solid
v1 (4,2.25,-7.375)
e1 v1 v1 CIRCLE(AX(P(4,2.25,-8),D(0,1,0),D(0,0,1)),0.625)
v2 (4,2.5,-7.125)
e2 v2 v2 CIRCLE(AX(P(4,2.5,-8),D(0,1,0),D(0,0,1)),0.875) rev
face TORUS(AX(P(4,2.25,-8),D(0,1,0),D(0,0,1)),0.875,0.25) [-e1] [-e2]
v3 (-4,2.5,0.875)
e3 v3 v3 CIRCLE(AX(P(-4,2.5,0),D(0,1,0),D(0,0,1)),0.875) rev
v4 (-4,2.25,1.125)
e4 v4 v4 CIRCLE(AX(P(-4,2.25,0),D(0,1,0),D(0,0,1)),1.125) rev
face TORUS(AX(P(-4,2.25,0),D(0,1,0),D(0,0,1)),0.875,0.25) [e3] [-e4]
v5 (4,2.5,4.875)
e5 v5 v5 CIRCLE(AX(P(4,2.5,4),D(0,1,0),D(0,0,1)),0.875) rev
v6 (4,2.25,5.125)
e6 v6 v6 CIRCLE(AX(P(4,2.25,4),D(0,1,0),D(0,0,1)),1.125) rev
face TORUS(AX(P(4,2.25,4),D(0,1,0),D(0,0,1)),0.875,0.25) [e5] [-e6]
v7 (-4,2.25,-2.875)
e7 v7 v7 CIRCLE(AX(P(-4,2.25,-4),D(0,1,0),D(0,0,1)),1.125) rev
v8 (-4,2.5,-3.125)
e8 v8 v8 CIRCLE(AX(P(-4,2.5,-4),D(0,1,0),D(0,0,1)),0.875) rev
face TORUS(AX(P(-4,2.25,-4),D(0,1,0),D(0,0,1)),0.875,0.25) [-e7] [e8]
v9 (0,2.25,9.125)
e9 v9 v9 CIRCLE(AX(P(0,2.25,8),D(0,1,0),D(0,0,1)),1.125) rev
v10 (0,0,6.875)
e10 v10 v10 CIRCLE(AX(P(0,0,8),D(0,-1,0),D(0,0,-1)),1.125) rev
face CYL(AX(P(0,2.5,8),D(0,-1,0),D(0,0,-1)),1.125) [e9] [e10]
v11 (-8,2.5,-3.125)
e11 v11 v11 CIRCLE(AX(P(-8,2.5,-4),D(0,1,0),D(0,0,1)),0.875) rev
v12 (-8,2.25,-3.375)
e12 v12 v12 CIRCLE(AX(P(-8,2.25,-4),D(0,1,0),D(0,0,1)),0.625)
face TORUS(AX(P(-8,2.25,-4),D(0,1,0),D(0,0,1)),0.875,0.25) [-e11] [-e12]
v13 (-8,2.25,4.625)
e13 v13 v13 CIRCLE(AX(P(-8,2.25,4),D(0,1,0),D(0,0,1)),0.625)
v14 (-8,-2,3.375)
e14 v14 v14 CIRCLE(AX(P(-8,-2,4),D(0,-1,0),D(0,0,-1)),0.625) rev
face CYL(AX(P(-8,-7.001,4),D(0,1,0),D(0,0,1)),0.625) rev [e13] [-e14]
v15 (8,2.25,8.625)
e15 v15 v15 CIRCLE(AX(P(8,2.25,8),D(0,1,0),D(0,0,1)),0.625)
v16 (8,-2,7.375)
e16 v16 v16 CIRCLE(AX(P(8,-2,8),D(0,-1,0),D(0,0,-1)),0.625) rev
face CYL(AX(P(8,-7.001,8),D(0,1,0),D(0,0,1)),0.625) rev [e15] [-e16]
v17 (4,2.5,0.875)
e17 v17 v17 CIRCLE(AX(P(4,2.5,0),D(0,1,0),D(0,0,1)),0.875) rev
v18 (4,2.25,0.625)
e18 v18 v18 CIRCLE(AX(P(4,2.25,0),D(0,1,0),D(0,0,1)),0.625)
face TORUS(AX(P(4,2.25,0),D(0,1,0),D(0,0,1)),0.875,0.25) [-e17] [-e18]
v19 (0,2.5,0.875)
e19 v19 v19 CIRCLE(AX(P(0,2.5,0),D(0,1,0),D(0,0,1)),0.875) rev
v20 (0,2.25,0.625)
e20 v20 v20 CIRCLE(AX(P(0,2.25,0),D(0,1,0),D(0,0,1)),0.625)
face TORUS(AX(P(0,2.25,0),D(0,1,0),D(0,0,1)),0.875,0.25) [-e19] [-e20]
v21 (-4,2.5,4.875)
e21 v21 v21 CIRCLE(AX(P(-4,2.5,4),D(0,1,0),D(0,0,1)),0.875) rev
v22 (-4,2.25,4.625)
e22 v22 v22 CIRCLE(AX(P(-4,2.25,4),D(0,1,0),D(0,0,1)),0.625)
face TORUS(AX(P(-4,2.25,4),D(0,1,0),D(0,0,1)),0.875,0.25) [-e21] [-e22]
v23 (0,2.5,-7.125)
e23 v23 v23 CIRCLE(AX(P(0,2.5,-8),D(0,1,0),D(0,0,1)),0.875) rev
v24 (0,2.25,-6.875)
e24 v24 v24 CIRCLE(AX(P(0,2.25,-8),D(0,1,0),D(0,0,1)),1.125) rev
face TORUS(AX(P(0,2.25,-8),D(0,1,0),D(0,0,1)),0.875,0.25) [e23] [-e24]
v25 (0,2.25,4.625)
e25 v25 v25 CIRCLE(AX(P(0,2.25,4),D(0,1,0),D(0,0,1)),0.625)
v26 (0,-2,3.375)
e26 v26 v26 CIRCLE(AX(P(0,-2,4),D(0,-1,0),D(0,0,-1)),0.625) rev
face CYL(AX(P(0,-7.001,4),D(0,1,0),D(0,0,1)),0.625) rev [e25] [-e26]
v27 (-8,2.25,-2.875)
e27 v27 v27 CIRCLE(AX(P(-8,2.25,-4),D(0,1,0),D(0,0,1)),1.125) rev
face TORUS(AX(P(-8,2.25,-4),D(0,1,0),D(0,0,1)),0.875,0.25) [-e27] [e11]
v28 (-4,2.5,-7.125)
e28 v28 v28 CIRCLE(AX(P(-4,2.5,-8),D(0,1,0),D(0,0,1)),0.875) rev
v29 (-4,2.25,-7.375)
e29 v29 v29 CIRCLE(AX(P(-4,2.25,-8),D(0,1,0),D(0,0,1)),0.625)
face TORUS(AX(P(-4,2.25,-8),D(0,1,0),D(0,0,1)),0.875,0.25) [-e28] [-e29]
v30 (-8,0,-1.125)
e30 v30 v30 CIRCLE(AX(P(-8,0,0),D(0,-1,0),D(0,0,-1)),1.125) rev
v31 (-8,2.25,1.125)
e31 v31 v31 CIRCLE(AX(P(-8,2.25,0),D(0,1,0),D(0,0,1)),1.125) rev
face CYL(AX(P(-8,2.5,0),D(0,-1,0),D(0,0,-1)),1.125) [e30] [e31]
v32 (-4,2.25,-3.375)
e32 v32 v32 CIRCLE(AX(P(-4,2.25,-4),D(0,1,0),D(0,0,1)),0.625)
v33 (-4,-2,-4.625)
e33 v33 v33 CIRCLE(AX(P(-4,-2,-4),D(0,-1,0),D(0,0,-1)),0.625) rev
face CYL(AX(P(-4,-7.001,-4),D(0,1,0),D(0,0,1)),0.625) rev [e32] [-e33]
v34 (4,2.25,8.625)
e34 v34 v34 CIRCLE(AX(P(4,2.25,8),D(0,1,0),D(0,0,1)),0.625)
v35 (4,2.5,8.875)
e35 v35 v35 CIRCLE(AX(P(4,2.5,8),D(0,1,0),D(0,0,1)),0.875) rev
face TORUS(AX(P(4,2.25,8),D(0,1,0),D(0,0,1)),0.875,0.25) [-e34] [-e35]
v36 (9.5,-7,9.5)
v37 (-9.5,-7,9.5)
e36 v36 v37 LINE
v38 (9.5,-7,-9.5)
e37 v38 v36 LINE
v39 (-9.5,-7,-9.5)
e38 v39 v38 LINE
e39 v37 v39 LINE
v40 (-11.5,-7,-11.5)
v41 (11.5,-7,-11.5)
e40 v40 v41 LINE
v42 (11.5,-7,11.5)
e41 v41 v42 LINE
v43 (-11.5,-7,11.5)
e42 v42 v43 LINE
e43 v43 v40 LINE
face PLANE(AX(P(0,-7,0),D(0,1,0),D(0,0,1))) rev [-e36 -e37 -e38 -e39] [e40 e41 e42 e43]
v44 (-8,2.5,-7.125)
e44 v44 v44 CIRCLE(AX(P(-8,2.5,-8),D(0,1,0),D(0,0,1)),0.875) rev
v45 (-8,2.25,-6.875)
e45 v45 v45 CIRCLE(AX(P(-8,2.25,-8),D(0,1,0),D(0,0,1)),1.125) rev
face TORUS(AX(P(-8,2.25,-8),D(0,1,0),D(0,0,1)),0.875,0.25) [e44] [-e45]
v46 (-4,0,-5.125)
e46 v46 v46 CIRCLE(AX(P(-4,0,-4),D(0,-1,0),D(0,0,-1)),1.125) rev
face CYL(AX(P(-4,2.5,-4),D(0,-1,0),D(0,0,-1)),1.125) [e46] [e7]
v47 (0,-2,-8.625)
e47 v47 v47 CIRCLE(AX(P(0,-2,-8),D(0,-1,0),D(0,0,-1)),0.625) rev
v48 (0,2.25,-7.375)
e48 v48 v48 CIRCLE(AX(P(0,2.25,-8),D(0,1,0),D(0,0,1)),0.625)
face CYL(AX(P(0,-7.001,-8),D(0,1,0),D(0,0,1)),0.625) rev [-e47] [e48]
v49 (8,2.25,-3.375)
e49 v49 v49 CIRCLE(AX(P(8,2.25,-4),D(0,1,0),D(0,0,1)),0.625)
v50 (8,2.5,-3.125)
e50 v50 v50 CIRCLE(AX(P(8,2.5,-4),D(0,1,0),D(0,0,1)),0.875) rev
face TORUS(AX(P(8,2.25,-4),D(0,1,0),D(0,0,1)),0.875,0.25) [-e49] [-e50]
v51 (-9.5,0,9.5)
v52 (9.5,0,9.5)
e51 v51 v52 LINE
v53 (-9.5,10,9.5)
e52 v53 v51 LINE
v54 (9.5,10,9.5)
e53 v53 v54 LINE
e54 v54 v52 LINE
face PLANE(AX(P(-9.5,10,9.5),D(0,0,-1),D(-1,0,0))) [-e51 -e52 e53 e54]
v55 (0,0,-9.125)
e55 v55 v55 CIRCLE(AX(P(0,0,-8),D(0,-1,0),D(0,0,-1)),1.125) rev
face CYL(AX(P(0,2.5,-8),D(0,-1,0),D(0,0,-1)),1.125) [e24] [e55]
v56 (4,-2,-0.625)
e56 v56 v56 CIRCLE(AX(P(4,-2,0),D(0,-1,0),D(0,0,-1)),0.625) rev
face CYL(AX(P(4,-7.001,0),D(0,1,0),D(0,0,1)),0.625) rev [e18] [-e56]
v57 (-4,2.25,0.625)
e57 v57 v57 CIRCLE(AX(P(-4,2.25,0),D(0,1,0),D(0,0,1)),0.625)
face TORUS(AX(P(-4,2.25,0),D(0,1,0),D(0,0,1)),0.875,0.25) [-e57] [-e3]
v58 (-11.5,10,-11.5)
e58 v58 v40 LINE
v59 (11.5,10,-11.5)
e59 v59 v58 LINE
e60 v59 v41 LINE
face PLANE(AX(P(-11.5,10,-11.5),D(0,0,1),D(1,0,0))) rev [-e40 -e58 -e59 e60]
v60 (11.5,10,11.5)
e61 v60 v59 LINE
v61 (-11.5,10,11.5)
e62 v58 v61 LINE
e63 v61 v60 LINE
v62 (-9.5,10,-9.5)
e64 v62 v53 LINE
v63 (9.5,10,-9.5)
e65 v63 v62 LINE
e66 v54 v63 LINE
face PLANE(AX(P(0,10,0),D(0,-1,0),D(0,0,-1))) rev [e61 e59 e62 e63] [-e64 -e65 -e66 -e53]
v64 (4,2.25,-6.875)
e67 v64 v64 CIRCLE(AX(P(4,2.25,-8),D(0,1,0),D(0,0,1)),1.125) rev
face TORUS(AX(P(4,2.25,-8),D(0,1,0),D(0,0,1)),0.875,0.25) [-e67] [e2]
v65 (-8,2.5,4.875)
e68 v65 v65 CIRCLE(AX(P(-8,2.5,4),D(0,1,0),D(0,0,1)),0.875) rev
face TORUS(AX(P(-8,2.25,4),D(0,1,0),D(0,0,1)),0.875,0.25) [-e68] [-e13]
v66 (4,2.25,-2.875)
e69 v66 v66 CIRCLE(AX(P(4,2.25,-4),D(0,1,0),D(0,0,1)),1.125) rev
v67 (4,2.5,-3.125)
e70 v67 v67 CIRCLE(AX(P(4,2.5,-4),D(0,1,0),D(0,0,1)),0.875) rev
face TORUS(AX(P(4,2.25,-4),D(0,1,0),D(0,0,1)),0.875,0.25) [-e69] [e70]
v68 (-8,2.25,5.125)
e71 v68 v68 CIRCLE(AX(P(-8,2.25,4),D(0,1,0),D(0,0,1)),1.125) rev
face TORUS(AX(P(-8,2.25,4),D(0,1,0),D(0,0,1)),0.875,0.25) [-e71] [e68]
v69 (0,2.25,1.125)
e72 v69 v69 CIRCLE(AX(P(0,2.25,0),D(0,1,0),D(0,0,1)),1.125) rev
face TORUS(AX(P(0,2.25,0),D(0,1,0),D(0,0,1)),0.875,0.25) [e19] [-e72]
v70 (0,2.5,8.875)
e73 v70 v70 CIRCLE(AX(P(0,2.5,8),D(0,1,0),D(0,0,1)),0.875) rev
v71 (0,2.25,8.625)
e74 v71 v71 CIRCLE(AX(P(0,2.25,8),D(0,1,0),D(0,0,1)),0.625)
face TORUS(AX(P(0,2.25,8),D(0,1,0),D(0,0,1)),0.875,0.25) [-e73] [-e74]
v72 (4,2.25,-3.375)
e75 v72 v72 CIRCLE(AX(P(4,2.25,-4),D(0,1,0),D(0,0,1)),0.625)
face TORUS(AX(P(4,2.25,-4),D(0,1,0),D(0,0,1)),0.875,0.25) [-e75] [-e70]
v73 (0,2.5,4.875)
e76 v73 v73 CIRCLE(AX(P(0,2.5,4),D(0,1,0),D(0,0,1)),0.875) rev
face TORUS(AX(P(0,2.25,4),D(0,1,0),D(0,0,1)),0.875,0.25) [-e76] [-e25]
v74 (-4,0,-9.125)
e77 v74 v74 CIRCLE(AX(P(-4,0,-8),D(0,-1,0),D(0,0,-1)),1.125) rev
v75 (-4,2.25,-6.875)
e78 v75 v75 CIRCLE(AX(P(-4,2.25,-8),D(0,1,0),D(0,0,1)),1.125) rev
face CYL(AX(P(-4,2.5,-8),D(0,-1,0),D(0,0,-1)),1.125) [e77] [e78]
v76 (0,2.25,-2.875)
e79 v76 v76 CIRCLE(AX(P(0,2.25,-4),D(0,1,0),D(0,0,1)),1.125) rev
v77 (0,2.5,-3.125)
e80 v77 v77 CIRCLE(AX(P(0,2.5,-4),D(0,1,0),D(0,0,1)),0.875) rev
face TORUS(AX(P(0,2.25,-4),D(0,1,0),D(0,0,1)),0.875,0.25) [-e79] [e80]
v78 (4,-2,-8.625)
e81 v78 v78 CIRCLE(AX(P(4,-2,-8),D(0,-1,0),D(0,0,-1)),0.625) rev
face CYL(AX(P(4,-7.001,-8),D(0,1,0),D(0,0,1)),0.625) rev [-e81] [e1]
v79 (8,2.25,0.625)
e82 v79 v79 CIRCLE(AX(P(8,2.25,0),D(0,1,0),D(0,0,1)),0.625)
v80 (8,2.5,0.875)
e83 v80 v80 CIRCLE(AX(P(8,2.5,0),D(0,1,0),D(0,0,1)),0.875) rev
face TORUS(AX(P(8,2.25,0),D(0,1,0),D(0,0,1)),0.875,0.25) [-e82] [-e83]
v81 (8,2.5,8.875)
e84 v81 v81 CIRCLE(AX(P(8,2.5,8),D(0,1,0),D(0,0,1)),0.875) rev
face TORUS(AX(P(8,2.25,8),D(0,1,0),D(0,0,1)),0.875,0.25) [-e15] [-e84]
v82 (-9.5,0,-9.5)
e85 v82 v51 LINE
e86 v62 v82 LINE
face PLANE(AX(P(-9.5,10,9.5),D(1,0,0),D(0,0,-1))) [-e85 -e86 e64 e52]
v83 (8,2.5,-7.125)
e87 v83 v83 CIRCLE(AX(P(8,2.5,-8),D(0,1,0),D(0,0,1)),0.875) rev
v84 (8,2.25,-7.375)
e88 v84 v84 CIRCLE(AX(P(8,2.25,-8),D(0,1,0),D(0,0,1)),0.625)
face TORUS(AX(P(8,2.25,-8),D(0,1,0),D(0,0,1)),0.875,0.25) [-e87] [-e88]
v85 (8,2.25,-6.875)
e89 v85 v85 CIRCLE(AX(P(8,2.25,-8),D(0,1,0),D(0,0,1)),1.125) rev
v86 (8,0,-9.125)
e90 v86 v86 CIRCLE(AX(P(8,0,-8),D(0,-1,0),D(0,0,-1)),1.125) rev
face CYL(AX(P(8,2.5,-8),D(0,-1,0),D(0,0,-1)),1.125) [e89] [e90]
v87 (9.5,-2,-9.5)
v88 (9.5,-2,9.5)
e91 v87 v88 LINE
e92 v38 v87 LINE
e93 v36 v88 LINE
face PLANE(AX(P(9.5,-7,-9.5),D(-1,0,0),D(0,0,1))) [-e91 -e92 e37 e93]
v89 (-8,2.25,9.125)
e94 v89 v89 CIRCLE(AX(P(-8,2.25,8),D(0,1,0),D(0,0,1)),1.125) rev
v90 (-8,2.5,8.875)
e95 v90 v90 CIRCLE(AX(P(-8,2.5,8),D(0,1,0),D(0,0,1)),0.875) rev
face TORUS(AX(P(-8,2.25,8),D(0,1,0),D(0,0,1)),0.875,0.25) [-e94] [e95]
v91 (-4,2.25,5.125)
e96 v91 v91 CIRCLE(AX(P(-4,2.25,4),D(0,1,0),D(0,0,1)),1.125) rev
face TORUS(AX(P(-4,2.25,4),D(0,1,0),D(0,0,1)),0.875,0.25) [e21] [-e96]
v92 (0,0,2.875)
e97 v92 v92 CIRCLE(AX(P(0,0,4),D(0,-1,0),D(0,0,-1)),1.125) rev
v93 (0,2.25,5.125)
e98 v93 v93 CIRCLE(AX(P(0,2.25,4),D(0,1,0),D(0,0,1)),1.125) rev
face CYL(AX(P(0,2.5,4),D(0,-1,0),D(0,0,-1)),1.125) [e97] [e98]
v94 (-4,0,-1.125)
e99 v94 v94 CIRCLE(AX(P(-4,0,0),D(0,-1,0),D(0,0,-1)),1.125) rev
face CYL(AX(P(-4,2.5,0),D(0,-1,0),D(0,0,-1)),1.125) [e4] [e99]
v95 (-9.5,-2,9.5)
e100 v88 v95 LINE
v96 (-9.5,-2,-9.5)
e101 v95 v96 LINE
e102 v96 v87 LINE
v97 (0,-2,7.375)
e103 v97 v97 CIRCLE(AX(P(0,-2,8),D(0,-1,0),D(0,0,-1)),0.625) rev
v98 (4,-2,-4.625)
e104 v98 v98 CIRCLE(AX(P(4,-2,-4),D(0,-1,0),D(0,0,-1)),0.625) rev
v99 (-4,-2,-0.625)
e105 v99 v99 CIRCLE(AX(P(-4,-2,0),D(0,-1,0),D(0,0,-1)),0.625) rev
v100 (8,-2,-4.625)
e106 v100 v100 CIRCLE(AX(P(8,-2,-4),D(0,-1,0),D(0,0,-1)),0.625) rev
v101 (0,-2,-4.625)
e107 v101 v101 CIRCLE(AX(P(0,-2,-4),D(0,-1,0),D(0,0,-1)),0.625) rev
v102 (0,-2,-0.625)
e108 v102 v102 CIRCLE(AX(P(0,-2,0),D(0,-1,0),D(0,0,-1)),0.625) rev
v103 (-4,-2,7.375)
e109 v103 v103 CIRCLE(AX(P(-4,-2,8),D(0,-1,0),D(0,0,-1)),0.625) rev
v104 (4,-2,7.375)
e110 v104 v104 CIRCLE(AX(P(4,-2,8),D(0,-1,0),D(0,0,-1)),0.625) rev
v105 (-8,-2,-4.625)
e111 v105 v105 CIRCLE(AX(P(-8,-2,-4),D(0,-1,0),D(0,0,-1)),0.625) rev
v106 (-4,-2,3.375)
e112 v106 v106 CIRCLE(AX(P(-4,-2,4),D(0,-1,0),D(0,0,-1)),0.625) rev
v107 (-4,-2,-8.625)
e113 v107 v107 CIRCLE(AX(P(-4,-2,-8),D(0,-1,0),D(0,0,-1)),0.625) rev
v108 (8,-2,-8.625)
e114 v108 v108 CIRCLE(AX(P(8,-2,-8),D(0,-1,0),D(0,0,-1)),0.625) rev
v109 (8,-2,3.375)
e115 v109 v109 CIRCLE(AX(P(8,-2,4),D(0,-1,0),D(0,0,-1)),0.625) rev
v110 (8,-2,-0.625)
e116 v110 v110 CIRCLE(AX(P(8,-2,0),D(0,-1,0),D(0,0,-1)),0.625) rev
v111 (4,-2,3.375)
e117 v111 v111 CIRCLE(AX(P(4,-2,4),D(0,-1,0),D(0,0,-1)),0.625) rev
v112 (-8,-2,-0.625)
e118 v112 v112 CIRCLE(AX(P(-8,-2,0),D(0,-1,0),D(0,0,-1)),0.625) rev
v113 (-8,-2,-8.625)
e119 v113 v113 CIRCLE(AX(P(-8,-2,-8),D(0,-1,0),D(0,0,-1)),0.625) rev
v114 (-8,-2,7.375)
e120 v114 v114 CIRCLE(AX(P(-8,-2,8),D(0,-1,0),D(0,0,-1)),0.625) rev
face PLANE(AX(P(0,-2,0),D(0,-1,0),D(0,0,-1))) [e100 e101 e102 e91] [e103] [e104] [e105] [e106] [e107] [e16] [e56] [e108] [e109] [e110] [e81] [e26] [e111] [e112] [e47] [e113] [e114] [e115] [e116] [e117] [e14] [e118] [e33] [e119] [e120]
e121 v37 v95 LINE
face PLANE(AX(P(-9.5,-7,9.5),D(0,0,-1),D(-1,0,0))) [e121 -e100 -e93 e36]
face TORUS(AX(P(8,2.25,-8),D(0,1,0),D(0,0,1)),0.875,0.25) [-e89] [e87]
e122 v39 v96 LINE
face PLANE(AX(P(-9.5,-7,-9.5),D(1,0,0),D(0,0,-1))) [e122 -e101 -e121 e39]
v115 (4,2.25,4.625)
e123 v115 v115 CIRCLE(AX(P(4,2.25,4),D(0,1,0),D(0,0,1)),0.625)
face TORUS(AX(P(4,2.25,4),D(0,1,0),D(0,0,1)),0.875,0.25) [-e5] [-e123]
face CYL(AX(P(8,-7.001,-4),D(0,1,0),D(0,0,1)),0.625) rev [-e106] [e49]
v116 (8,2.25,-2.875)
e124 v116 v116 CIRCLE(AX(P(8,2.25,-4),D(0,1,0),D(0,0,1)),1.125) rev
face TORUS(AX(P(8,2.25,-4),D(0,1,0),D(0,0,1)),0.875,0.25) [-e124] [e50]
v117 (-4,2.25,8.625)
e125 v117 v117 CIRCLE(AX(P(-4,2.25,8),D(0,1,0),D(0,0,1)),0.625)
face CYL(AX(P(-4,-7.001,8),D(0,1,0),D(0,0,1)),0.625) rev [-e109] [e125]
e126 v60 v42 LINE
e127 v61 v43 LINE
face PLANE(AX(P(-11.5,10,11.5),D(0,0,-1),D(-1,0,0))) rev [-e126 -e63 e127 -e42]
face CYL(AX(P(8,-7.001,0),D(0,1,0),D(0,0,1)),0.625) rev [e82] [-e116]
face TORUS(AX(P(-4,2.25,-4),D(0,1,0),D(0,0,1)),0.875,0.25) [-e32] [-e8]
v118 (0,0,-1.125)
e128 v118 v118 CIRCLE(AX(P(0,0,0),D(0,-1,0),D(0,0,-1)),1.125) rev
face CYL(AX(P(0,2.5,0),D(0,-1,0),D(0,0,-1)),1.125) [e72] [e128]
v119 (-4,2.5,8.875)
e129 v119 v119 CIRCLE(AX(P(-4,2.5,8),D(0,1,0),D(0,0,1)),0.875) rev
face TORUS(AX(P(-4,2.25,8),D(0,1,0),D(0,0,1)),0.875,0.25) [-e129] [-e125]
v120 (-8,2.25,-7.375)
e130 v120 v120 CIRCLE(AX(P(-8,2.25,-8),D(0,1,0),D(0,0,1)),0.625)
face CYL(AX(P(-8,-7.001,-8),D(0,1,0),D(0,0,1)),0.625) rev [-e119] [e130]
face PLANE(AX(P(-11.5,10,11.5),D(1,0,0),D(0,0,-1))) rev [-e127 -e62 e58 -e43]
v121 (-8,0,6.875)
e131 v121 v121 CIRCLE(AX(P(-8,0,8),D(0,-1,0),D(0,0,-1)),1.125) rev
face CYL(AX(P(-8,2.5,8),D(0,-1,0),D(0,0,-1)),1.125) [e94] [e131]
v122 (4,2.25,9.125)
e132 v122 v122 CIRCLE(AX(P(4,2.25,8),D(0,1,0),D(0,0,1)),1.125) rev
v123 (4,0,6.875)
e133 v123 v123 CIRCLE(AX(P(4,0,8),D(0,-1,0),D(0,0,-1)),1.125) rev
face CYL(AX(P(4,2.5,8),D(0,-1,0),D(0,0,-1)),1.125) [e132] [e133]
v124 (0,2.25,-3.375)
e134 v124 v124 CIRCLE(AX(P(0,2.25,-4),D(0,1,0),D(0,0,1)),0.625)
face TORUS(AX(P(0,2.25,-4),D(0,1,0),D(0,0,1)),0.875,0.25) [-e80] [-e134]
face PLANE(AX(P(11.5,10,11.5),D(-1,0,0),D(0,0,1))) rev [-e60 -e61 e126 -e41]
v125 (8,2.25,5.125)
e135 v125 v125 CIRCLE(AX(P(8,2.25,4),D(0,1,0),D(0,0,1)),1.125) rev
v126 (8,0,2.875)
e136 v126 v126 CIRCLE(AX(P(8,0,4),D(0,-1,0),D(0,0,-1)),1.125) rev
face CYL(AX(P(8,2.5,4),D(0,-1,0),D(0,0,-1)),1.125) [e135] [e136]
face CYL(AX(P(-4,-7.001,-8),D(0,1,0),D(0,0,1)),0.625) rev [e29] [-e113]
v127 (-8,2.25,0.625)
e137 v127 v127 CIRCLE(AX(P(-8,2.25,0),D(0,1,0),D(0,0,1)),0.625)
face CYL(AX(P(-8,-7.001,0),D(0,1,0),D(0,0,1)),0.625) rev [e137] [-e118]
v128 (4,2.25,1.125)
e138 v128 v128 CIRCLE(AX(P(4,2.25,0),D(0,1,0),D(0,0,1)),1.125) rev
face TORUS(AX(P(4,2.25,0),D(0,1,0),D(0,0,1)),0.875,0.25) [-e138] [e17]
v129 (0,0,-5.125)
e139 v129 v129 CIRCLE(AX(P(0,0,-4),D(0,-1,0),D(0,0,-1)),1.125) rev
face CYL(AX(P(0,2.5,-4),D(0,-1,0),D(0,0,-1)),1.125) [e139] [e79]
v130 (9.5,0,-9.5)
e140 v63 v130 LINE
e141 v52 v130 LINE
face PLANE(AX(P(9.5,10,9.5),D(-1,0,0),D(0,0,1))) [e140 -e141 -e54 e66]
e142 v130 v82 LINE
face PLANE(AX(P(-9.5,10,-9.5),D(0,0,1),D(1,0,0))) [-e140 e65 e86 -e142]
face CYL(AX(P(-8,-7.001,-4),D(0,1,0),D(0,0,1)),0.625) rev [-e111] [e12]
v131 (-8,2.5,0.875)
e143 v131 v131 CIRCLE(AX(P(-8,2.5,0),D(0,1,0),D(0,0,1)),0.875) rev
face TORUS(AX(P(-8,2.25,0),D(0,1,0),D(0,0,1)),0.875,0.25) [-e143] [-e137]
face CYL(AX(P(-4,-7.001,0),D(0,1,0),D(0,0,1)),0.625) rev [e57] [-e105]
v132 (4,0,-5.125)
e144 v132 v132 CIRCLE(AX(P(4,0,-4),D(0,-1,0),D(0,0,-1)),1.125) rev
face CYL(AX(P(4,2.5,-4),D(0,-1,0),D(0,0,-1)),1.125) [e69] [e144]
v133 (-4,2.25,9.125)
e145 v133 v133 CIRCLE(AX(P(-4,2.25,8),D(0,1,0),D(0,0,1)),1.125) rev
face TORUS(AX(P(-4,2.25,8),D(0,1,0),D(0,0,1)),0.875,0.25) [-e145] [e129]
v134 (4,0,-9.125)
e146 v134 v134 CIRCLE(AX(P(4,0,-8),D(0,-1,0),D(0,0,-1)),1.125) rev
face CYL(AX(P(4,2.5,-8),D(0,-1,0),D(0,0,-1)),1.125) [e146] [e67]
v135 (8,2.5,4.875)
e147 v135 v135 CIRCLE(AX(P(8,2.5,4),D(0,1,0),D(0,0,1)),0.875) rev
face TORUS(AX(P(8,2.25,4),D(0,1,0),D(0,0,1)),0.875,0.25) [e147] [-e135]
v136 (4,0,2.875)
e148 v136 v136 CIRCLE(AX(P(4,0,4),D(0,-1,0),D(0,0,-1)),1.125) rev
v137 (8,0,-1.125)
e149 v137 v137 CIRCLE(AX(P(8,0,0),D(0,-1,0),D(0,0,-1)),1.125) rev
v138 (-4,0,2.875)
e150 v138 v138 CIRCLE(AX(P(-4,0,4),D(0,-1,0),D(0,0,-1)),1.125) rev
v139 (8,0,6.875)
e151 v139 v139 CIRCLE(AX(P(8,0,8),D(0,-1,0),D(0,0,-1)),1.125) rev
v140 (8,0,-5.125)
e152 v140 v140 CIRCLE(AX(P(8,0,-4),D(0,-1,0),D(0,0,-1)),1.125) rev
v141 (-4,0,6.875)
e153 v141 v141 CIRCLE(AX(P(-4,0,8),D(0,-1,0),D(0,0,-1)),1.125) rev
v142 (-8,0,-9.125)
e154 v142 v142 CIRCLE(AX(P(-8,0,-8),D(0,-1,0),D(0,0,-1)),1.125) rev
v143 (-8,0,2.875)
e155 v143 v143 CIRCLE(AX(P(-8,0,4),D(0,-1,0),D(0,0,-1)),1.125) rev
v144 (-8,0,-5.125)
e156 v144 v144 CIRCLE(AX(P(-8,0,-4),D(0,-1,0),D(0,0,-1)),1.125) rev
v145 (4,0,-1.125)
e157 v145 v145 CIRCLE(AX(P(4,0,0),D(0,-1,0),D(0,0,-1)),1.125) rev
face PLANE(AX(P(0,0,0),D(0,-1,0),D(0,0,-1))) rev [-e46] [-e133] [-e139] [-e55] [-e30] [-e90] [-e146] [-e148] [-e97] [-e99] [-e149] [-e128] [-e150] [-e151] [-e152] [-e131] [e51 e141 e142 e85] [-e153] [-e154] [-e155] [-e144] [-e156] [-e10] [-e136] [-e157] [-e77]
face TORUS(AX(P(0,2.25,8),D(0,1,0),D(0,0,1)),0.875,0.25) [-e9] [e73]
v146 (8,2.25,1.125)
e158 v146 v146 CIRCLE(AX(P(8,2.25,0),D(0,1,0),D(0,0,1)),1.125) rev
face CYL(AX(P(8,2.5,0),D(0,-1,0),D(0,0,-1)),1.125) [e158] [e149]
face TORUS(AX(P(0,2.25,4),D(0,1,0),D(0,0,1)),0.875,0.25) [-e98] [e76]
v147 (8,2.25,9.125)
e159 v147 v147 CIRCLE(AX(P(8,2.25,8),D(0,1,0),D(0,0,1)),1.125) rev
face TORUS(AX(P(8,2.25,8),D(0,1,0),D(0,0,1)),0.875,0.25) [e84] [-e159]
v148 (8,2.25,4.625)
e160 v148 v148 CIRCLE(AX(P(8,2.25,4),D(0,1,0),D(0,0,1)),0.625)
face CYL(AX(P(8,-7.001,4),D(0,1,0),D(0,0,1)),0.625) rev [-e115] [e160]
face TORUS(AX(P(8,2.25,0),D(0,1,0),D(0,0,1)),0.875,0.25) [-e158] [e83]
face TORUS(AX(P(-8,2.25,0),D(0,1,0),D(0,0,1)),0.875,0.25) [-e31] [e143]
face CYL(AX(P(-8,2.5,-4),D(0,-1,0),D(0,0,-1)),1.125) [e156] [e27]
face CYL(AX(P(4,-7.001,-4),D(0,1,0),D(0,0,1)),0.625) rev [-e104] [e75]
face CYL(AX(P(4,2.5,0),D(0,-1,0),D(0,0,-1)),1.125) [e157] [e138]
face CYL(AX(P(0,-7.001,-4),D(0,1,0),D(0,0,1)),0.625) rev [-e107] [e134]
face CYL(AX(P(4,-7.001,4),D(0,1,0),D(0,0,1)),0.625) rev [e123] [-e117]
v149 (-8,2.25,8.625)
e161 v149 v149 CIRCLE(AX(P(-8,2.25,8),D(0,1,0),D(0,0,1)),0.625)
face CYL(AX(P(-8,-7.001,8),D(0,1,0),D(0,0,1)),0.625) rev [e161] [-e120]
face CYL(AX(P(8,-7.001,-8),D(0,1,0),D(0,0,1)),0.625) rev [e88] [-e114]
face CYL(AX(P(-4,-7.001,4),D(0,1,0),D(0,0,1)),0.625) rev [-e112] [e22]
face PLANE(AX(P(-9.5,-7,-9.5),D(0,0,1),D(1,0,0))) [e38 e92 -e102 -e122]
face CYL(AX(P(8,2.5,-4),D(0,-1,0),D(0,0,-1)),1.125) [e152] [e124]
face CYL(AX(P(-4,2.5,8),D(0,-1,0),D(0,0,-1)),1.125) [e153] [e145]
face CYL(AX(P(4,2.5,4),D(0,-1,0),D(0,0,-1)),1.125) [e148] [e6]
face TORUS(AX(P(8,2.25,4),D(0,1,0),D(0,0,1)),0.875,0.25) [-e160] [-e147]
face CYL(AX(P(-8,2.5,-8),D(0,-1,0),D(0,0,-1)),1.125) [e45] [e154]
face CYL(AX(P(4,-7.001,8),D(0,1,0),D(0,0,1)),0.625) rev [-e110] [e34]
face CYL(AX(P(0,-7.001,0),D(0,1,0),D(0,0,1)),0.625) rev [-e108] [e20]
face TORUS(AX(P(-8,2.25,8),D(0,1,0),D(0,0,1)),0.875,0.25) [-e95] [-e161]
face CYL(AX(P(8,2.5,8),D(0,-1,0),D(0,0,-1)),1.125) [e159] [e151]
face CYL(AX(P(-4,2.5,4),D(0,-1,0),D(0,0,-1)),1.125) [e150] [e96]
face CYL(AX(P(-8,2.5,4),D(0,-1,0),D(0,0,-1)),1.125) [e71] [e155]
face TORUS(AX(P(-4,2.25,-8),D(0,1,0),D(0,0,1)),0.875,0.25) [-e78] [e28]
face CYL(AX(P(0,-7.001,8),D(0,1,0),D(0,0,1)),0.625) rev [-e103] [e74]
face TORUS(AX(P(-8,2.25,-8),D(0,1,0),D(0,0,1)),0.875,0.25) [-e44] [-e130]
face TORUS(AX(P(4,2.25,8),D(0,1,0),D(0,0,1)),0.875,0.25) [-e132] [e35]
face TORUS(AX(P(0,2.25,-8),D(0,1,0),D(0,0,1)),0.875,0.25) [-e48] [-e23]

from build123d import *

# Parameters (mm, degrees)
SKETCH1_W              = 23
SKETCH1_H              = 23
SKETCH1_W_2            = 19
SKETCH1_H_2            = 19
BOSS_EXTRUDE1_DEPTH    = 10
SKETCH2_W              = 23
SKETCH2_H              = 23
BOSS_EXTRUDE2_DEPTH    = 2
SKETCH3_W              = 23
SKETCH3_H              = 23
SKETCH3_W_2            = 19
SKETCH3_H_2            = 19
BOSS_EXTRUDE3_DEPTH    = 5
SKETCH6_R              = 1.125
BOSS_EXTRUDE5_DEPTH    = 2.5
CUT_EXTRUDE2_REACH     = 20.835
SKETCH7_R              = 0.625
FILLET3_R              = 0.25
LPATTERN1_COUNT        = 5
LPATTERN1_PITCH        = 4
LPATTERN1_COUNT_DIR2   = 5
LPATTERN1_PITCH_DIR2   = 4
FILLET3_OF_LPATTERN1_R = 0.25


with BuildPart() as part:
    # Sketch1 → Boss-Extrude1 (new body)
    with BuildSketch(Plane(origin=(0, 0, 0), x_dir=(1, 0, 0), z_dir=(0, 1, 0))):
        Rectangle(SKETCH1_W, SKETCH1_H)
        Rectangle(SKETCH1_W_2, SKETCH1_H_2, mode=Mode.SUBTRACT)
    extrude(amount=BOSS_EXTRUDE1_DEPTH)

    # Sketch2 → Boss-Extrude2 (add)
    with BuildSketch(Plane.XZ):
        Rectangle(SKETCH2_W, SKETCH2_H)
    extrude(amount=BOSS_EXTRUDE2_DEPTH)

    # Sketch3 → Boss-Extrude3 (add)
    with BuildSketch(Plane.XZ.offset(2)):
        Rectangle(SKETCH3_W, SKETCH3_H)
        Rectangle(SKETCH3_W_2, SKETCH3_H_2, mode=Mode.SUBTRACT)
    extrude(amount=BOSS_EXTRUDE3_DEPTH)

    # Sketch6 → Boss-Extrude5 (add)
    with BuildSketch(Plane(origin=(0, 0, 0), x_dir=(1, 0, 0), z_dir=(0, 1, 0))):
        with Locations(Location((8, 8, 0), (0, 0, 90))):
            Circle(SKETCH6_R)
    boss_extrude5 = extrude(amount=BOSS_EXTRUDE5_DEPTH)

    # Sketch7 → Cut-Extrude2 (cut, up to next)
    with BuildSketch(Plane(origin=(0, 2.5, 0), x_dir=(1, 0, 0), z_dir=(0, 1, 0)), mode=Mode.PRIVATE) as cut_extrude2_sk1:
        with Locations(Location((8, 8, 0), (0, 0, 270))):
            Circle(SKETCH7_R)
    cut_extrude2_tool1 = extrude(cut_extrude2_sk1.sketch, amount=-CUT_EXTRUDE2_REACH, mode=Mode.PRIVATE) & part.part
    cut_extrude2 = cut_extrude2_tool1.solids().sort_by_distance((8, 2.5, -8))[0]
    add(cut_extrude2, mode=Mode.SUBTRACT)

    # Fillet3
    fillet3_edges = [part.edges().sort_by_distance(p)[0] for p in [
        (8, 2.5, -6.875),
        (8, 2.5, -8.625),
    ]]
    fillet(fillet3_edges, radius=FILLET3_R - 0.0001)  # a hair under: the kernel refuses the full size

    # LPattern1: Boss-Extrude5, Cut-Extrude2 5 × 5
    with Locations(*[(-j * LPATTERN1_PITCH_DIR2, 0, i * LPATTERN1_PITCH) for i in range(LPATTERN1_COUNT) for j in range(LPATTERN1_COUNT_DIR2) if (i, j) != (0, 0)]):
        add(boss_extrude5)
        add(cut_extrude2, mode=Mode.SUBTRACT)

    # Fillet3 of LPattern1
    fillet3_of_lpattern1_edges = [part.edges().sort_by_distance(p)[0] for p in [
        (4, 2.5, -6.875),
        (4, 2.5, -8.625),
        (0, 2.5, -6.875),
        (0, 2.5, -8.625),
        (-4, 2.5, -6.875),
        (-4, 2.5, -8.625),
        (-8, 2.5, -6.875),
        (-8, 2.5, -8.625),
        (8, 2.5, -2.875),
        (8, 2.5, -4.625),
        (4, 2.5, -2.875),
        (4, 2.5, -4.625),
        (0, 2.5, -2.875),
        (0, 2.5, -4.625),
        (-4, 2.5, -2.875),
        (-4, 2.5, -4.625),
        (-8, 2.5, -2.875),
        (-8, 2.5, -4.625),
        (8, 2.5, 1.125),
        (8, 2.5, -0.625),
        (4, 2.5, 1.125),
        (4, 2.5, -0.625),
        (0, 2.5, 1.125),
        (0, 2.5, -0.625),
        (-4, 2.5, 1.125),
        (-4, 2.5, -0.625),
        (-8, 2.5, 1.125),
        (-8, 2.5, -0.625),
        (8, 2.5, 5.125),
        (8, 2.5, 3.375),
        (4, 2.5, 5.125),
        (4, 2.5, 3.375),
        (0, 2.5, 5.125),
        (0, 2.5, 3.375),
        (-4, 2.5, 5.125),
        (-4, 2.5, 3.375),
        (-8, 2.5, 5.125),
        (-8, 2.5, 3.375),
        (8, 2.5, 9.125),
        (8, 2.5, 7.375),
        (4, 2.5, 9.125),
        (4, 2.5, 7.375),
        (0, 2.5, 9.125),
        (0, 2.5, 7.375),
        (-4, 2.5, 9.125),
        (-4, 2.5, 7.375),
        (-8, 2.5, 9.125),
        (-8, 2.5, 7.375),
    ]]
    fillet(fillet3_of_lpattern1_edges, radius=FILLET3_OF_LPATTERN1_R - 0.0001)  # a hair under: the kernel refuses the full size


solid = part.part
